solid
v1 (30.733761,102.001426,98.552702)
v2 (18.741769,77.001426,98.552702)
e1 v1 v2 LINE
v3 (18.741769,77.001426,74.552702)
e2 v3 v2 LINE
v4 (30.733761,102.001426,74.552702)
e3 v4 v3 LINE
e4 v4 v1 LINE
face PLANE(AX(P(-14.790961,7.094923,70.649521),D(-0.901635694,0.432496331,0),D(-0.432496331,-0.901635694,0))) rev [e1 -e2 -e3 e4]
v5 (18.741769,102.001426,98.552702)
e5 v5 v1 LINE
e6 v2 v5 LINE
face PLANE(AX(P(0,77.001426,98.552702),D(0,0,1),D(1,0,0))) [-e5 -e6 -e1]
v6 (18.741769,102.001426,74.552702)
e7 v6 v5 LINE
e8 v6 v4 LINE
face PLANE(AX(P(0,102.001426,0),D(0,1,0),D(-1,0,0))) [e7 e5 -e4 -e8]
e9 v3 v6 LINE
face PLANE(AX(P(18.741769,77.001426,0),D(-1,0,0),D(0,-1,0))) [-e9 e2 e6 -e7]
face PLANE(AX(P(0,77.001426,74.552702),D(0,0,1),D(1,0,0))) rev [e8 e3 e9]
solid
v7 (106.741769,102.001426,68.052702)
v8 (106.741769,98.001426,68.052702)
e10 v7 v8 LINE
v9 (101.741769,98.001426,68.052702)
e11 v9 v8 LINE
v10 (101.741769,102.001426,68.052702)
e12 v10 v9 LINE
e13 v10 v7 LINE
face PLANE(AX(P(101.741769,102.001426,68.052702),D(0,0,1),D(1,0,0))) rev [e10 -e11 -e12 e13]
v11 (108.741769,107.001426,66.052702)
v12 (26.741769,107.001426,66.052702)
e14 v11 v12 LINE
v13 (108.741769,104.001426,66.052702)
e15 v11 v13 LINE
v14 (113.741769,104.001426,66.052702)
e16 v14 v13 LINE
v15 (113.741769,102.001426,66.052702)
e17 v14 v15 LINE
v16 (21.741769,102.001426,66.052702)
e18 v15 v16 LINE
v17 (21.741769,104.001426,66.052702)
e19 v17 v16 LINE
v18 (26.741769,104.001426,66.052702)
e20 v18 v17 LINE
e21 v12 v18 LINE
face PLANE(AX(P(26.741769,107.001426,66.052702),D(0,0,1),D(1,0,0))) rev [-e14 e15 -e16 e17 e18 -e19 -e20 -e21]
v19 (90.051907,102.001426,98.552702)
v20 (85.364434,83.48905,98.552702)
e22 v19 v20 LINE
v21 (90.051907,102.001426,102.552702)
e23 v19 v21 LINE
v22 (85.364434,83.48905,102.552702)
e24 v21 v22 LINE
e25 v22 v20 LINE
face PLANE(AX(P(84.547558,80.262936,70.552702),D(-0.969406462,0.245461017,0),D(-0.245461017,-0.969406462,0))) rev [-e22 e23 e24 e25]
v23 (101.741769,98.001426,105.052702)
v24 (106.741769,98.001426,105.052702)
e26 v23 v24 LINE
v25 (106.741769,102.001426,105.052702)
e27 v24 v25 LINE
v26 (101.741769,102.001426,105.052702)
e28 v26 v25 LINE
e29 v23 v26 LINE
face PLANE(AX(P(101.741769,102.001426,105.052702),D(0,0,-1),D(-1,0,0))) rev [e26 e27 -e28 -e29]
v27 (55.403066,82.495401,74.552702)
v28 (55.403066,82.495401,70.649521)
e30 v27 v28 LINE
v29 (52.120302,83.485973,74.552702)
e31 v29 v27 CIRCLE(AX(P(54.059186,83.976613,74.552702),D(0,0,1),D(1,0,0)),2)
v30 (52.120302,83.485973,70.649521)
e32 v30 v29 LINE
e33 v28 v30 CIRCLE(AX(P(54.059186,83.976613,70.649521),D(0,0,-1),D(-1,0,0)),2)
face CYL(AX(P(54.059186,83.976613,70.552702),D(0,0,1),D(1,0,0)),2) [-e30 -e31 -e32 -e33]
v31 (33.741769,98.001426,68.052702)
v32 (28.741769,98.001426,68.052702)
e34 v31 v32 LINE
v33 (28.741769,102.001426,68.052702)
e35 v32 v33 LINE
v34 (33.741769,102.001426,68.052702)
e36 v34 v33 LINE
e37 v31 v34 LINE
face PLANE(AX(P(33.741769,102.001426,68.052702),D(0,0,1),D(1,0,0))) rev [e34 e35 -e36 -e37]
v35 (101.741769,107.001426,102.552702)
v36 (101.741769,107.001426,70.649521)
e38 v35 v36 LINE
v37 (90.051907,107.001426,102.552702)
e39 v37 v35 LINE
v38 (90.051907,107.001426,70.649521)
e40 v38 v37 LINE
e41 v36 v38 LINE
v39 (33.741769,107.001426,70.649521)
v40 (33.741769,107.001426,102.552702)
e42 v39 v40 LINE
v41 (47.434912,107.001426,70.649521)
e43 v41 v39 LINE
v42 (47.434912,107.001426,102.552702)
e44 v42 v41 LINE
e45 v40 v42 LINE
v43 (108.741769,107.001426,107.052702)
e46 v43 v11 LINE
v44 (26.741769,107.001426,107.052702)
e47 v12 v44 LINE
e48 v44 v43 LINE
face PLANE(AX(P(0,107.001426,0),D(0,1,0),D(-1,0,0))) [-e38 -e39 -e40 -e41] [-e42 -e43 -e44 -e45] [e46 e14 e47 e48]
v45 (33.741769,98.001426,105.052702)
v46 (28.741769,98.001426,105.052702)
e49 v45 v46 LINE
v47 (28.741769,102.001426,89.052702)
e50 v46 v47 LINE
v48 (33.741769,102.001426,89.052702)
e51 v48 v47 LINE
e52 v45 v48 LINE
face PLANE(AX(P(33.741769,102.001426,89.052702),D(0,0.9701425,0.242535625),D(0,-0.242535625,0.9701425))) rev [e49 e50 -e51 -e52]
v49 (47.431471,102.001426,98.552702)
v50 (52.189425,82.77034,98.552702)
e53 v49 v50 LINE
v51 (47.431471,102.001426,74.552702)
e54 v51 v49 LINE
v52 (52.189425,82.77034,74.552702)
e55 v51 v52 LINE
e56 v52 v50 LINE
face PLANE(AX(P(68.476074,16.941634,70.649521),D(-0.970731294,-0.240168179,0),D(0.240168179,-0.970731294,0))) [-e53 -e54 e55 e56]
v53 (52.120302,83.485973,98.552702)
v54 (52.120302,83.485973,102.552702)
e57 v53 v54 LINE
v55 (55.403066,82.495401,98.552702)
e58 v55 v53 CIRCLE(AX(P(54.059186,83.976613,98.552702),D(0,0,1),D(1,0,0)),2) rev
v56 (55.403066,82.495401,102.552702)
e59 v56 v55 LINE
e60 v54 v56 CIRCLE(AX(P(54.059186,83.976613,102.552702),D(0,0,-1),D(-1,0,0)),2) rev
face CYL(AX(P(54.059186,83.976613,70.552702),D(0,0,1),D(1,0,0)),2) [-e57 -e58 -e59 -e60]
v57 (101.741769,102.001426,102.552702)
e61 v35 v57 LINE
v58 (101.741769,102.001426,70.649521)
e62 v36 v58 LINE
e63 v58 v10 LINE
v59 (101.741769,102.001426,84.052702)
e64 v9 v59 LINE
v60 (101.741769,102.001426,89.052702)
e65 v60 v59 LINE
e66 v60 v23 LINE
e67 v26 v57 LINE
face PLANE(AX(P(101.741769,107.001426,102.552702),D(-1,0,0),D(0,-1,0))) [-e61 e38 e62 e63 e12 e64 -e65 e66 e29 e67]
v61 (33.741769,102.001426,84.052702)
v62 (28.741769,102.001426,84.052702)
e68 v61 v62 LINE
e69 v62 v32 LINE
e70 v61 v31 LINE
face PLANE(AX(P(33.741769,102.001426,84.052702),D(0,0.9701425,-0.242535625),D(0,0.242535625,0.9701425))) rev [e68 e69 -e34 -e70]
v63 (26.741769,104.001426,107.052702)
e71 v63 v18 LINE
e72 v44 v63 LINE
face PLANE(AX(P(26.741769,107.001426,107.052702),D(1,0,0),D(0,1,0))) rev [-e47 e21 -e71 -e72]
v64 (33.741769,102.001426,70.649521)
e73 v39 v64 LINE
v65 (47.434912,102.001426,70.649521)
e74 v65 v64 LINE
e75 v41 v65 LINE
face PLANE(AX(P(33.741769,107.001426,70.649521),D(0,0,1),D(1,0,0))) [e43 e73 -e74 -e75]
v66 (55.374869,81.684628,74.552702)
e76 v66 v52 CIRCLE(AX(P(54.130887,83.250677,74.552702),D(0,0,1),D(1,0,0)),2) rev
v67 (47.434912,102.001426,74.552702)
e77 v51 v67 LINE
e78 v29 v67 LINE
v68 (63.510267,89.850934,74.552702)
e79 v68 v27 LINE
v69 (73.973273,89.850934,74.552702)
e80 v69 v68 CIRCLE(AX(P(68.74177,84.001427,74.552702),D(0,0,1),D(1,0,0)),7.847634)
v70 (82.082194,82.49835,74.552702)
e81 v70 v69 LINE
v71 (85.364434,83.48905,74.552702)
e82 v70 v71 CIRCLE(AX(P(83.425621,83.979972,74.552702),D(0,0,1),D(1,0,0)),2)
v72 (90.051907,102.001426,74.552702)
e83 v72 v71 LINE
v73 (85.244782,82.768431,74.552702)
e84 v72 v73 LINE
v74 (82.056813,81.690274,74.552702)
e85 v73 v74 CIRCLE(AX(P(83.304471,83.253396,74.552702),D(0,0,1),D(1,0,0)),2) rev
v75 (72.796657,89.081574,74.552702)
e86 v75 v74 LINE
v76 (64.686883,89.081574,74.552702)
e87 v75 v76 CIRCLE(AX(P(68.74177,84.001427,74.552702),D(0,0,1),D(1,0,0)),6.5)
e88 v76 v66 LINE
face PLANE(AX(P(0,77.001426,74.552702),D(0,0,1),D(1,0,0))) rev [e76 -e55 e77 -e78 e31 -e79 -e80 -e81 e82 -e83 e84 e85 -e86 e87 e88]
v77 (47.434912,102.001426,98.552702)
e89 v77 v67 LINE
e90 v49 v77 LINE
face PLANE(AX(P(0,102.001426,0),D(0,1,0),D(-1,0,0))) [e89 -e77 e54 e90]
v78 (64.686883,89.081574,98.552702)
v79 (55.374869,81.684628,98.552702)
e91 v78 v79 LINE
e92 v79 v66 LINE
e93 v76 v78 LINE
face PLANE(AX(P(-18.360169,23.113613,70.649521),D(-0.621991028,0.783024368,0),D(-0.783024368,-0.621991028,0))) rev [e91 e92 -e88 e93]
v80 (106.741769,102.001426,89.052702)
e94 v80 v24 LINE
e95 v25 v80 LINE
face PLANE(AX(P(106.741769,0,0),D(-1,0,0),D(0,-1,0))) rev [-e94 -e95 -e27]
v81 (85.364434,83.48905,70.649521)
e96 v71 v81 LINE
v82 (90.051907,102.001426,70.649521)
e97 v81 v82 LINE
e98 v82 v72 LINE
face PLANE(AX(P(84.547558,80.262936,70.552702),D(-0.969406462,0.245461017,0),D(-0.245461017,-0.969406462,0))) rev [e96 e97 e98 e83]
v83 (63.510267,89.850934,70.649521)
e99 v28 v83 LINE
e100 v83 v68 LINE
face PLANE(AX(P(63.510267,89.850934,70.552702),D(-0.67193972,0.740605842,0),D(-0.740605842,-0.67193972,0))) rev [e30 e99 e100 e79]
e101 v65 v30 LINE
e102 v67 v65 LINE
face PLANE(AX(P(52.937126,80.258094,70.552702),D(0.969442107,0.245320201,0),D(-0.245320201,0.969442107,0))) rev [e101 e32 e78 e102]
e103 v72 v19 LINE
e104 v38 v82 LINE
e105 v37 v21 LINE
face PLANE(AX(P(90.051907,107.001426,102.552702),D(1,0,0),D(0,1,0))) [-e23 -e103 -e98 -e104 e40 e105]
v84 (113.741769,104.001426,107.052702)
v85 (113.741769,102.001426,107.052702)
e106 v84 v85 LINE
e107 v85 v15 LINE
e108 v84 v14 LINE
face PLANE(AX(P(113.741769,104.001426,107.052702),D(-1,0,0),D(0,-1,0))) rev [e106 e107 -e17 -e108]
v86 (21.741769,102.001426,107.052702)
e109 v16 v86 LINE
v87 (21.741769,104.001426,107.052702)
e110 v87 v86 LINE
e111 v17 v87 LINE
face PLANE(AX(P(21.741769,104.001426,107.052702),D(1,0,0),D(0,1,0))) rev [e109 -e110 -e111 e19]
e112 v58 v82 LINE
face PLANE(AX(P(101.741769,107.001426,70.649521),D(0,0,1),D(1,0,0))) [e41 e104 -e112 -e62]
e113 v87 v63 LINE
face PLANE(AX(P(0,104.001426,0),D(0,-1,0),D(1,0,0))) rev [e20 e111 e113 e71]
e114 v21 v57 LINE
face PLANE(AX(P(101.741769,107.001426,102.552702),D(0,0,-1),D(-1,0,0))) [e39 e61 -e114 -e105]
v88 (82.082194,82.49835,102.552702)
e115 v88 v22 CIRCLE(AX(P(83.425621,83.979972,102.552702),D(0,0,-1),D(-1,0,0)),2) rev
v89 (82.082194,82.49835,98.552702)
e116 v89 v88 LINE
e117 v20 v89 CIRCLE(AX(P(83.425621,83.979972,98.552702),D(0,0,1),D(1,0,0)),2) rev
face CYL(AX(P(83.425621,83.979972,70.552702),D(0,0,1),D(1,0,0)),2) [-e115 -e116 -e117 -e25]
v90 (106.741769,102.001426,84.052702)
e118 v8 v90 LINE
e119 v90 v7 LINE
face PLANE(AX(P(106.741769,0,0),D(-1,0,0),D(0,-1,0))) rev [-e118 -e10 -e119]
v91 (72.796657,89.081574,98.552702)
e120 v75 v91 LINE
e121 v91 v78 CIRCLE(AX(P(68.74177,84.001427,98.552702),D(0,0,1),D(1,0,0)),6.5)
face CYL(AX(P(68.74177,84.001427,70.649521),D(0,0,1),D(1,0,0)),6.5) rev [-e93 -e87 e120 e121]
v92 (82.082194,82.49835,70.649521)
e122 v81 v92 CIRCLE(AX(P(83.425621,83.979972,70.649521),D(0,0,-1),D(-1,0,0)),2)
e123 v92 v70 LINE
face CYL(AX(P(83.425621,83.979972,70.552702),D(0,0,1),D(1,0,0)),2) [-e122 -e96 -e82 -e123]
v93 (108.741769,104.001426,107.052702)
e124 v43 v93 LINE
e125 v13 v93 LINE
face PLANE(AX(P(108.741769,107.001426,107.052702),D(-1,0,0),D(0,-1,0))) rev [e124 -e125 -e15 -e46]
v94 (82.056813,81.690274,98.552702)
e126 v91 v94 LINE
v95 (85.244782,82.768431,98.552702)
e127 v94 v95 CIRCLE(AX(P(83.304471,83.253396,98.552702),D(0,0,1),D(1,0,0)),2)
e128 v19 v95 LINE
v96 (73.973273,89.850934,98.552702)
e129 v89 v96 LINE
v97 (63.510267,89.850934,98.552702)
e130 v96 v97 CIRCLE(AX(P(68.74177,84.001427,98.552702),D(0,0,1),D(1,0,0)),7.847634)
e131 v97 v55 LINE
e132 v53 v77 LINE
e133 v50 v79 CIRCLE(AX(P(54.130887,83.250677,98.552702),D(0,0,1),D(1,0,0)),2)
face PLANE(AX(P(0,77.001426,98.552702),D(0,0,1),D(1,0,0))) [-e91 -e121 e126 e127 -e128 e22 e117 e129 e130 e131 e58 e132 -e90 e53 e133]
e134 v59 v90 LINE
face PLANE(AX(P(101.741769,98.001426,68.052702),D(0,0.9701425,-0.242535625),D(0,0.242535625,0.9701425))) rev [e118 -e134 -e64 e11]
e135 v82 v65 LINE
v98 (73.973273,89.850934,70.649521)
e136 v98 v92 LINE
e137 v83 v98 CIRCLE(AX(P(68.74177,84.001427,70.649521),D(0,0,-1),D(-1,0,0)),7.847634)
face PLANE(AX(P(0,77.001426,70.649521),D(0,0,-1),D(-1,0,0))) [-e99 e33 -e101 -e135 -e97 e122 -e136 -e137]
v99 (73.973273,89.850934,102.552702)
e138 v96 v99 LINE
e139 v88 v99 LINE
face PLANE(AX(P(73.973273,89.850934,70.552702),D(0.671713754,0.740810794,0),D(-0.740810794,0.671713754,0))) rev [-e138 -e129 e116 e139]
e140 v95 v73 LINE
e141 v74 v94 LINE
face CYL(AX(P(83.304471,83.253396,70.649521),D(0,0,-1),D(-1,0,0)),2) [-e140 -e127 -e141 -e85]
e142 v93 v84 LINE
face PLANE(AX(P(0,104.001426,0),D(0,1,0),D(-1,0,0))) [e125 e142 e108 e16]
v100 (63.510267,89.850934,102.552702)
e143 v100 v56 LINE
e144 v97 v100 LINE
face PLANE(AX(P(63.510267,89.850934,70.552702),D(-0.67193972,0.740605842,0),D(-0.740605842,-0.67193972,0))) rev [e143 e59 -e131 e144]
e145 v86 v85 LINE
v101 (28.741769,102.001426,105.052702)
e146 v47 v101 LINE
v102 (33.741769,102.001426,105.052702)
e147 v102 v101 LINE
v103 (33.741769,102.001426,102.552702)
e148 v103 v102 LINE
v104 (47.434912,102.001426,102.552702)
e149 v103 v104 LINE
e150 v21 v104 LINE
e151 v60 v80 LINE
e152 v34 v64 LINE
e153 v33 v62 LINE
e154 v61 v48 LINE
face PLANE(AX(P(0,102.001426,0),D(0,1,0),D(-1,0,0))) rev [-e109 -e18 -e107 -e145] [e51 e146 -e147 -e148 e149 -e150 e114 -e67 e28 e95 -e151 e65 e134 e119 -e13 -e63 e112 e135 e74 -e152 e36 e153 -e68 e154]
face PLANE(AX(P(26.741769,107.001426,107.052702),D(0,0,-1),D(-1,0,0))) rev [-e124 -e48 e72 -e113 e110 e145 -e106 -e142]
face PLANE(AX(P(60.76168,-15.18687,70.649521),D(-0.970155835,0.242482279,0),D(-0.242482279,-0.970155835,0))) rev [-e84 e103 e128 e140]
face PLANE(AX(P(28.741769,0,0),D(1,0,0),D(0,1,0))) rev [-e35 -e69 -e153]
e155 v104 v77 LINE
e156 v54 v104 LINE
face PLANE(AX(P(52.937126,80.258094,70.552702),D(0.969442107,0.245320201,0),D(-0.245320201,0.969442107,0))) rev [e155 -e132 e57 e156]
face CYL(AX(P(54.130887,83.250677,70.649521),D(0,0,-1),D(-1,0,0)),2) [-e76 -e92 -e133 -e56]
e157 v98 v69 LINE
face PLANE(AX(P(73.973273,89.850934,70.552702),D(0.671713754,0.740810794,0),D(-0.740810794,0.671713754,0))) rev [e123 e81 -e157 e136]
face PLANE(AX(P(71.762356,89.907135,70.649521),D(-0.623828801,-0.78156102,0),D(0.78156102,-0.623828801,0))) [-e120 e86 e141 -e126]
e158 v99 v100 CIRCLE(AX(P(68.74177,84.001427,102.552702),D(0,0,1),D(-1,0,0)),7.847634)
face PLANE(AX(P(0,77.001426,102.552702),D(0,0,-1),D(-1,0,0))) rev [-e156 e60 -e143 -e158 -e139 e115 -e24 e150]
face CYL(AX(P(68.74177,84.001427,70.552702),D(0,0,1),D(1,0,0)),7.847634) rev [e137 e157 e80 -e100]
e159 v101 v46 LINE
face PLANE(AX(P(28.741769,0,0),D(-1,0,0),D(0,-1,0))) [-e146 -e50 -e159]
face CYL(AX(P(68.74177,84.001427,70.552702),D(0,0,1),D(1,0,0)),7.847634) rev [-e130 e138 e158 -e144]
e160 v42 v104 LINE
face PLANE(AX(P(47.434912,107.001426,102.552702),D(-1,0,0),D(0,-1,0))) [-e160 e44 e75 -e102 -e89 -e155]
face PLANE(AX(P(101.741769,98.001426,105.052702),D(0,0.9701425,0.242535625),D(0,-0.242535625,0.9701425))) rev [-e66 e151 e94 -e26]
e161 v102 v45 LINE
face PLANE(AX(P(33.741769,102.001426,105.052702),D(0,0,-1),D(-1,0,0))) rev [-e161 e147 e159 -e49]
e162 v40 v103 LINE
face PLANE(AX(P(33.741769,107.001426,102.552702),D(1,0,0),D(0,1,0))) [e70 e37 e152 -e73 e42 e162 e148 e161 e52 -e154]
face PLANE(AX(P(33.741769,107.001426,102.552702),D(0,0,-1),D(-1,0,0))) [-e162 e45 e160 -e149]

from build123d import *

# Parameters (mm, degrees)
SKETCH_1_W                = 95.051874556
SKETCH_1_H                = 3.903181728
EXTRUDE_1_DEPTH           = 25
SKETCH_1_H_2              = 4
EXTRUDE_1_2_DEPTH         = 25
CUT_EXTRUDE_15_DEPTH      = 32
EXTRUDE_START             = 74.552702475
EXTRUDE_5_OUTLINE_W       = 95.051874556
EXTRUDE_5_OUTLINE_H       = 25
EXTRUDE_5_DEPTH           = 24
CUT_EXTRUDE_16_DEPTH      = 158.81601617
CUT_EXTRUDE_16_DEPTH_BACK = 158.81601617
SKETCH_3_R                = 6.5
FILLET_2_R                = 2
FILLET_3_R                = 2
EXTRUDE_6_DEPTH           = 5
EXTRUDE_6_2_DEPTH         = 5
EXTRUDE_7_DEPTH           = 5
EXTRUDE_7_2_DEPTH         = 5
SKETCH_6_W                = 82
SKETCH_6_H                = 41
SKETCH_6_W_2              = 13.693142479
SKETCH_6_H_2              = 31.903181728
SKETCH_6_W_3              = 11.689861707
EXTRUDE_8_DEPTH           = 5
SKETCH_7_W                = 5
SKETCH_7_H                = 41
EXTRUDE_9_DEPTH           = 2
CUT_EXTRUDE_START         = 74.552702475
CUT_EXTRUDE_17_DEPTH      = 24


# Read off the part's stored shape, not the designer's step: Бобышка-Вытянуть5, Вырез-Вытянуть17
with BuildPart() as part:
    # Эскиз1 → Бобышка-Вытянуть1 (new body)
    with BuildSketch(Plane(origin=(0, 102.001425994, 0), x_dir=(1, 0, 0), z_dir=(0, 1, 0))):
        with Locations((66.267706326, -72.601111611)):
            Rectangle(SKETCH_1_W, SKETCH_1_H)
    extrude(amount=-EXTRUDE_1_DEPTH)


with BuildPart() as body_2:
    # Эскиз1 → Extrude 1 2 (new body)
    with BuildSketch(Plane(origin=(0, 102.001425994, 0), x_dir=(1, 0, 0), z_dir=(0, 1, 0))):
        with Locations((66.267706326, -100.552702475)):
            Rectangle(SKETCH_1_W, SKETCH_1_H_2)
    extrude(amount=-EXTRUDE_1_2_DEPTH)


with BuildPart() as cut_extrude_15_tool:
    # Эскиз2 → Вырез-Вытянуть15 (new body)
    with BuildSketch(Plane.XY.offset(102.552702475)):
        with BuildLine():
            Line((63.510266919, 89.850934142), (52.937126115, 80.258094246))
            Line((52.937126115, 80.258094246), (47.434911527, 102.001425994))
            Line((47.434911527, 102.001425994), (18.741769048, 102.001425994))
            Line((18.741769048, 102.001425994), (18.741769048, 77.001425994))
            Line((18.741769048, 77.001425994), (113.793643604, 77.001425994))
            Line((113.793643604, 77.001425994), (113.793643604, 102.001425994))
            Line((113.793643604, 102.001425994), (90.051907341, 102.001425994))
            Line((90.051907341, 102.001425994), (84.547557962, 80.262935973))
            Line((84.547557962, 80.262935973), (73.973273177, 89.850934142))
            ThreePointArc((73.973273177, 89.850934142), (68.741770048, 91.84906096), (63.510266919, 89.850934142))
        make_face()
    extrude(amount=-CUT_EXTRUDE_15_DEPTH)


with BuildPart() as part_1:
    add(part.part)

    # Вырез-Вытянуть15: cut by cut_extrude_15_tool
    add(cut_extrude_15_tool.part, mode=Mode.SUBTRACT)



with BuildPart() as body_2_1:
    add(body_2.part)

    # Вырез-Вытянуть15: cut by cut_extrude_15_tool
    add(cut_extrude_15_tool.part, mode=Mode.SUBTRACT)


with BuildPart() as part_2:
    add(part_1.part)

    add(body_2_1.part)  # Бобышка-Вытянуть5 merges body 2
    # Бобышка-Вытянуть5 outline → Бобышка-Вытянуть5 (add)
    with BuildSketch(Plane.XY.offset(EXTRUDE_START)):
        with Locations((66.267706326, 89.501425994)):
            Rectangle(EXTRUDE_5_OUTLINE_W, EXTRUDE_5_OUTLINE_H)
    extrude(amount=EXTRUDE_5_DEPTH)

    # Эскиз3 → Вырез-Вытянуть16 (cut, two sides: drawn at the far end of the back side and taken through both)
    with BuildSketch(Plane.XY.offset(110.052702475).offset(-CUT_EXTRUDE_16_DEPTH_BACK)):
        with BuildLine():
            Line((52.937126115, 79.748220071), (47.431470764, 102.001425994))
            Line((47.431470764, 102.001425994), (30.73376132, 102.001425994))
            Line((30.73376132, 102.001425994), (18.741769048, 77.001425994))
            Line((18.741769048, 77.001425994), (88.549097609, 77.001425994))
            ThreePointArc((88.549097609, 77.001425994), (92.13390173, 85.931402357), (99.789402086, 80.101426994))
            ThreePointArc((99.789402086, 80.101426994), (99.571745411, 78.493558676), (98.934442488, 77.001425994))
            Line((98.934442488, 77.001425994), (113.793643604, 77.001425994))
            Line((113.793643604, 77.001425994), (113.793643604, 102.001425994))
            Line((113.793643604, 102.001425994), (90.051907341, 102.001425994))
            Line((90.051907341, 102.001425994), (84.489905965, 79.748220071))
            Line((84.489905965, 79.748220071), (72.796657252, 89.081573622))
            ThreePointArc((72.796657252, 89.081573622), (74.598679081, 86.82040138), (75.241770048, 84.001426994))
            ThreePointArc((75.241770048, 84.001426994), (65.922795662, 78.144517962), (64.686882844, 89.081573622))
            Line((64.686882844, 89.081573622), (52.937126115, 79.748220071))
        make_face()
        with Locations((68.741770048, 84.001426994)):
            Circle(SKETCH_3_R)
    extrude(amount=CUT_EXTRUDE_16_DEPTH + CUT_EXTRUDE_16_DEPTH_BACK, mode=Mode.SUBTRACT)


with BuildPart() as cut_extrude_16_piece_1:
    # of the separate pieces the step leaves, piece 1, a body of its own (cut_extrude_16_pieces)
    add(part_2.part.solids().sort_by_distance((90.051907341, 102.001425994, 74.552702475))[0])

    # Скругление2
    fillet_2_edges = [cut_extrude_16_piece_1.edges().sort_by_distance(p)[0] for p in [
        (52.937126115, 80.258094246, 72.601111611),
        (84.547557962, 80.262935973, 72.601111611),
        (84.547557962, 80.262935973, 100.552702475),
        (52.937126115, 80.258094246, 100.552702475),
    ]]
    fillet(fillet_2_edges, radius=FILLET_2_R)

    # Скругление3
    fillet_3_edges = [cut_extrude_16_piece_1.edges().sort_by_distance(p)[0] for p in [
        (52.937126115, 79.748220071, 86.552702475),
        (84.489905965, 79.748220071, 86.552702475),
    ]]
    fillet(fillet_3_edges, radius=FILLET_3_R)



with BuildPart() as cut_extrude_16_piece_2:
    # of the separate pieces the step leaves, piece 2, a body of its own (cut_extrude_16_pieces)
    add(part_2.part.solids().sort_by_distance((18.741769048, 102.001425994, 74.552702475))[0])


with BuildPart() as cut_extrude_16_piece_3:
    # of the separate pieces the step leaves, piece 3, a body of its own (cut_extrude_16_pieces)
    add(part_2.part.solids().sort_by_distance((88.549097609, 77.001425994, 74.552702475))[0])

    # Вырез-Вытянуть17 outline → Вырез-Вытянуть17 (cut)
    with BuildSketch(Plane.XY.offset(CUT_EXTRUDE_START)):
        with BuildLine():
            Line((88.549097609, 77.001425994), (98.934442488, 77.001425994))
            ThreePointArc((98.934442488, 77.001425994), (93.741770049, 86.149059032), (88.549097609, 77.001425994))
        make_face()
    extrude(amount=CUT_EXTRUDE_17_DEPTH, mode=Mode.SUBTRACT)


with BuildPart() as body_4:
    # Эскиз4 → Бобышка-Вытянуть6 (new body)
    with BuildSketch(Plane(origin=(28.741769048, 0, 0), x_dir=(0, 0, -1), z_dir=(1, 0, 0))):
        Polygon((-105.052702475, 102.001425994), (-105.052702475, 98.001425994), (-89.052702475, 102.001425994), align=None)
    extrude(amount=EXTRUDE_6_DEPTH)


with BuildPart() as body_5:
    # Эскиз4 → Extrude 6 2 (new body)
    with BuildSketch(Plane(origin=(28.741769048, 0, 0), x_dir=(0, 0, -1), z_dir=(1, 0, 0))):
        Polygon((-68.052702475, 102.001425994), (-68.052702475, 98.001425994), (-84.052702475, 102.001425994), align=None)
    extrude(amount=EXTRUDE_6_2_DEPTH)


with BuildPart() as body_6:
    # Эскиз5 → Бобышка-Вытянуть7 (new body)
    with BuildSketch(Plane.ZY.offset(-106.741769048)):
        Polygon((105.052702475, 102.001425994), (105.052702475, 98.001425994), (89.052702475, 102.001425994), align=None)
    extrude(amount=EXTRUDE_7_DEPTH)


with BuildPart() as body_7:
    # Эскиз5 → Extrude 7 2 (new body)
    with BuildSketch(Plane.ZY.offset(-106.741769048)):
        Polygon((68.052702475, 102.001425994), (84.052702475, 102.001425994), (68.052702475, 98.001425994), align=None)
    extrude(amount=EXTRUDE_7_2_DEPTH)


with BuildPart() as cut_extrude_16_piece_1_1:
    add(cut_extrude_16_piece_1.part)

    add(body_4.part)  # Бобышка-Вытянуть8 merges body 4

    add(body_5.part)  # Бобышка-Вытянуть8 merges body 5

    add(body_6.part)  # Бобышка-Вытянуть8 merges body 6

    add(body_7.part)  # Бобышка-Вытянуть8 merges body 7
    # Эскиз6 → Бобышка-Вытянуть8 (add)
    with BuildSketch(Plane(origin=(0, 102.001425994, 0), x_dir=(1, 0, 0), z_dir=(0, 1, 0))):
        with Locations((67.741769048, -86.552702475)):
            Rectangle(SKETCH_6_W, SKETCH_6_H)
        with Locations((40.588340288, -86.601111611)):
            Rectangle(SKETCH_6_W_2, SKETCH_6_H_2, mode=Mode.SUBTRACT)
        with Locations((95.896838195, -86.601111611)):
            Rectangle(SKETCH_6_W_3, SKETCH_6_H_2, mode=Mode.SUBTRACT)
    extrude(amount=EXTRUDE_8_DEPTH)

    # Эскиз7 → Бобышка-Вытянуть9 (add)
    with BuildSketch(Plane(origin=(0, 102.001425994, 0), x_dir=(1, 0, 0), z_dir=(0, 1, 0))):
        with Locations((24.241769048, -86.552702475)):
            Rectangle(SKETCH_7_W, SKETCH_7_H)
        with Locations((111.241769048, -86.552702475)):
            Rectangle(SKETCH_7_W, SKETCH_7_H)
    extrude(amount=EXTRUDE_9_DEPTH)


solid = Compound([cut_extrude_16_piece_2.part, cut_extrude_16_piece_1_1.part])
